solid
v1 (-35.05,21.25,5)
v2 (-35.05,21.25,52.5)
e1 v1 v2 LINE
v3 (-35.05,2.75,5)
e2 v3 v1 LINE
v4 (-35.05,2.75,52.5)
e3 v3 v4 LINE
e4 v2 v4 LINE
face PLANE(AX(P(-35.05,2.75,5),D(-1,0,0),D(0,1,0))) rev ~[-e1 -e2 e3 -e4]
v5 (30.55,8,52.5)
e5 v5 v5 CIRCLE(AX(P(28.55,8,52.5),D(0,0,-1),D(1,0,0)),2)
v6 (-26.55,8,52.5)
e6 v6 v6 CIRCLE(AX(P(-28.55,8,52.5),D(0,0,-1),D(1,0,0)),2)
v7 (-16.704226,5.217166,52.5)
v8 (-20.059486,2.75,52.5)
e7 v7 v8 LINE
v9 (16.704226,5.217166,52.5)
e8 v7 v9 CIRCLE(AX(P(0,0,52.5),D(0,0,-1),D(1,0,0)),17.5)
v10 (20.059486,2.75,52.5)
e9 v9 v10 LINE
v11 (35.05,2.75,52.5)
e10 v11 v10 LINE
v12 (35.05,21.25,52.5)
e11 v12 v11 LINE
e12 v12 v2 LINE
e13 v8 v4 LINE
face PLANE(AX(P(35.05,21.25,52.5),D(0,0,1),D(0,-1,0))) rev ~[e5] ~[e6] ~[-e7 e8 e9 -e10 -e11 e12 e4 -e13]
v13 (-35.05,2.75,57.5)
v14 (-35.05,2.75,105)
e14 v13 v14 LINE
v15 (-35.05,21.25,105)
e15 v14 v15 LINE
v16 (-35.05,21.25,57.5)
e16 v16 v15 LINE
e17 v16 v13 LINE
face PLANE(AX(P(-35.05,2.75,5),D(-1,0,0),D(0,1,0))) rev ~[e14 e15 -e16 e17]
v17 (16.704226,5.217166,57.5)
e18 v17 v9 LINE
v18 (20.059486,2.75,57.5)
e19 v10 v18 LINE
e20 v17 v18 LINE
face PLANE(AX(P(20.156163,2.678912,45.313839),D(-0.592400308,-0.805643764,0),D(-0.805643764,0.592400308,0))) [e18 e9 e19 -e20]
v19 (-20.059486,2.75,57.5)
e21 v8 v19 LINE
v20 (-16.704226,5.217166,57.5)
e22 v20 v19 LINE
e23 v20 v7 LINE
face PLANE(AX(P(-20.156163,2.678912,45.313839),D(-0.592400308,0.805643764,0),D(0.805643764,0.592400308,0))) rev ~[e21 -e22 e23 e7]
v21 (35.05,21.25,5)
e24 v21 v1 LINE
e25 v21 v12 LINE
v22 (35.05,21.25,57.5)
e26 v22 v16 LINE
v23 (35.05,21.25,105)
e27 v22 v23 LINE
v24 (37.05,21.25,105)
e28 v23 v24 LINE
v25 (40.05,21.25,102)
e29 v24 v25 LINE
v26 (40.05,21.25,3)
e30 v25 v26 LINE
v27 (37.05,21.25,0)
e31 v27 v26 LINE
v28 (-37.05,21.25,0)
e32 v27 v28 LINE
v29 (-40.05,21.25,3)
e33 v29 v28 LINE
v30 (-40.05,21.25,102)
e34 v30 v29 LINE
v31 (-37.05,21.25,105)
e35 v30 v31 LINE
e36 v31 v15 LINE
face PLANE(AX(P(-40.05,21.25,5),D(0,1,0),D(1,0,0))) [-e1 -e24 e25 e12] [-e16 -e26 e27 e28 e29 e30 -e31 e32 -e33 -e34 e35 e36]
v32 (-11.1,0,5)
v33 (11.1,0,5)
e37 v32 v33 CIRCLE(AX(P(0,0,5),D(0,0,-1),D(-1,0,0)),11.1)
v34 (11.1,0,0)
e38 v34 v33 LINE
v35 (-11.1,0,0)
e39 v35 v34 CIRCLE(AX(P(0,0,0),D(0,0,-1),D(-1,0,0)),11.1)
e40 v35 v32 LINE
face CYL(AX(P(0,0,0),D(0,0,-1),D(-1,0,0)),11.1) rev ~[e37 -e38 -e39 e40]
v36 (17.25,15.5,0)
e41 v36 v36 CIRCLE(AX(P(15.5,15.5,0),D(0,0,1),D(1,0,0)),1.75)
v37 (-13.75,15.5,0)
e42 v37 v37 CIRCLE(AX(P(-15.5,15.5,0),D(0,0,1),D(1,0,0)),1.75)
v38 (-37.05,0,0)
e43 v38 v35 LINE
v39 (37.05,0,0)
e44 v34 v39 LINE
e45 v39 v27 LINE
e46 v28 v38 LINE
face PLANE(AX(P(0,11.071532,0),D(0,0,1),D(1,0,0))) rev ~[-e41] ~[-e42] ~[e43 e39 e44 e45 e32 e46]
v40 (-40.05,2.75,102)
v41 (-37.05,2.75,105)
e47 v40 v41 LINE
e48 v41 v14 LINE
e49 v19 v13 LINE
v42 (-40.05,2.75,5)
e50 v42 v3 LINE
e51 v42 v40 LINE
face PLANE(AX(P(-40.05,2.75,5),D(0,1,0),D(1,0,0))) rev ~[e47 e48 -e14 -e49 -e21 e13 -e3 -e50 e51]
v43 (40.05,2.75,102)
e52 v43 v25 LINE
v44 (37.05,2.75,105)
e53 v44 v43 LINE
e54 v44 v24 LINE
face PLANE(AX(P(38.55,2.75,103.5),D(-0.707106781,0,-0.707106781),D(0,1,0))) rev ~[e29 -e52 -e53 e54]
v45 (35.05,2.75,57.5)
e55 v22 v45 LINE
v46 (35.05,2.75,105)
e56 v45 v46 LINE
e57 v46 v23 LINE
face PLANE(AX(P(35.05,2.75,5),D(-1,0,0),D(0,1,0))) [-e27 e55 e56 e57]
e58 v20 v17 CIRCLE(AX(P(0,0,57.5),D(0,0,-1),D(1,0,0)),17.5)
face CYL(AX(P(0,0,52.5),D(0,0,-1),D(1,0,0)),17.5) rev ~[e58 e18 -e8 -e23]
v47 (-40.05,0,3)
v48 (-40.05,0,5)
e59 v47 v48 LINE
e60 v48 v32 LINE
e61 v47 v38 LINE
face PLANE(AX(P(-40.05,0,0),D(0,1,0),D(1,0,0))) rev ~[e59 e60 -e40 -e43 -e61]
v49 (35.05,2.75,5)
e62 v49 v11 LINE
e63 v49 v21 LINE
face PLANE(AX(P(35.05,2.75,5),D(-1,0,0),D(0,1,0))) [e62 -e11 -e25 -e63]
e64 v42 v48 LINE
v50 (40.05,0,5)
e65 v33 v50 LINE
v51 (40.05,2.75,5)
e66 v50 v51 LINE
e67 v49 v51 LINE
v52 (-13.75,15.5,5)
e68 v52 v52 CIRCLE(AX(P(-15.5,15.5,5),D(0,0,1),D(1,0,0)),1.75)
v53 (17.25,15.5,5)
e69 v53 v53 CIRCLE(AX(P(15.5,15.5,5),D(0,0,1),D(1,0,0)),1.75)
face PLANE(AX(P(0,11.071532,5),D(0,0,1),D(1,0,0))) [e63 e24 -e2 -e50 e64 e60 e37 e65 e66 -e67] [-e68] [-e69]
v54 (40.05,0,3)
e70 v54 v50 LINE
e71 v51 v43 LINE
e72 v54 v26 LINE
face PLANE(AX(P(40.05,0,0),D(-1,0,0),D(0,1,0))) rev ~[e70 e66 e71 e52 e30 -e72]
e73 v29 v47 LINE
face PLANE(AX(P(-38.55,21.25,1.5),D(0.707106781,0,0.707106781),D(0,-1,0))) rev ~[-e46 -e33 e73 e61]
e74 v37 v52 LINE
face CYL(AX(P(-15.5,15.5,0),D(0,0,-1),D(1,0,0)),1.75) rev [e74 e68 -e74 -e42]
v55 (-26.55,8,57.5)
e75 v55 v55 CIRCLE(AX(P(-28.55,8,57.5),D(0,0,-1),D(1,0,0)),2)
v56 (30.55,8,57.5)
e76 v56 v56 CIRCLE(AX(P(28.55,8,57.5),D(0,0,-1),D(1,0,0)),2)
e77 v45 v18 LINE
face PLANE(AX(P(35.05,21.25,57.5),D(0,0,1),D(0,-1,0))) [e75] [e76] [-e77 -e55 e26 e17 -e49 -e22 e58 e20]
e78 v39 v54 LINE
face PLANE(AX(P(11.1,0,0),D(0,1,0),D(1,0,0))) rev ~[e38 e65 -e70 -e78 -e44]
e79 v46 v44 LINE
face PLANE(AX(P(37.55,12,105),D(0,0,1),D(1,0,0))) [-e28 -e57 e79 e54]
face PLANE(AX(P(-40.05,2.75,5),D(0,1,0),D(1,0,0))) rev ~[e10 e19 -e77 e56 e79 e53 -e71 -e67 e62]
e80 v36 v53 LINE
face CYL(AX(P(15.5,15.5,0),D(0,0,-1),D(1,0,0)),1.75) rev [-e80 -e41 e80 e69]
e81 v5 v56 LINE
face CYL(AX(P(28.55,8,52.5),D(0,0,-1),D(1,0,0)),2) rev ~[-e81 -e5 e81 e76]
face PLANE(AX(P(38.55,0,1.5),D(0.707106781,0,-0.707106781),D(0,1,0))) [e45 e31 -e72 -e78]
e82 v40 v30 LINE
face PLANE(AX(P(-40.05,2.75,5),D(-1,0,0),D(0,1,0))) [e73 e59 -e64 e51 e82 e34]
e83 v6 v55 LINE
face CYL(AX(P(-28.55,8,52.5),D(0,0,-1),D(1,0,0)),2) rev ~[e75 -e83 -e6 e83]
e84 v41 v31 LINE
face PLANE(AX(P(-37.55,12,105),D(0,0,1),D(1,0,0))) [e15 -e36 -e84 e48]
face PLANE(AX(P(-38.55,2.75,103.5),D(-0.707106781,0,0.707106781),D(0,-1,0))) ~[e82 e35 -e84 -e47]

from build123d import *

# Parameters (mm, degrees)
F0_R        = 1.75
F1_DEPTH    = 5
F2_W        = 5
F2_H        = 18.5
F3_DEPTH    = 100
F4_W        = 18.5
F4_H        = 5
F5_DEPTH    = 70.1
F6_R        = 17.5
F6_R_2      = 2
F7_DEPTH    = 25
F8_SIZE     = 3
F9_T1_DEPTH = 19.3723210726


# Not quite as in the source:
# - a fillet or chamfer that OpenCascade refuses, or shapes differently, is made with other operations: its cross-section is extruded or revolved along the edge and cut away or added


with BuildPart() as f1:
    # F0 (on Top) → F1 (new body)
    with BuildSketch(Plane.XY):
        with BuildLine():
            ThreePointArc((-11.1, 0), (0, 11.1), (11.1, 0))
            Line((11.1, 0), (40.05, 0))
            Line((40.05, 0), (40.05, 21.25))
            Line((40.05, 21.25), (-40.05, 21.25))
            Line((-40.05, 21.25), (-40.05, 0))
            Line((-40.05, 0), (-11.1, 0))
        make_face()
        with Locations((-15.5, 15.5)):
            Circle(F0_R, mode=Mode.SUBTRACT)
        with Locations((15.5, 15.5)):
            Circle(F0_R, mode=Mode.SUBTRACT)
    extrude(amount=F1_DEPTH)

    # F2 (on face) → F3 (join)
    with BuildSketch(Plane.XY.offset(5)):
        with Locations((-37.55, 12)):
            Rectangle(F2_W, F2_H)
        with Locations((37.55, 12)):
            Rectangle(F2_W, F2_H)
    extrude(amount=F3_DEPTH)

    # F4 (on face) → F5 (join, through all)
    with BuildSketch(Plane(origin=(35.05, 0, 0), x_dir=(0, -1, 0), z_dir=(-1, 0, 0))):
        with Locations((-12, 55)):
            Rectangle(F4_W, F4_H)
    extrude(amount=F5_DEPTH)

    # F6 (on face) → F7 (cut)
    with BuildSketch(Plane(origin=(0, 0, 52.5), x_dir=(1, 0, 0), z_dir=(0, 0, -1))):
        Circle(F6_R)
        with Locations((-28.55, -8)):
            Circle(F6_R_2)
        with Locations((28.55, -8)):
            Circle(F6_R_2)
    extrude(amount=-F7_DEPTH, mode=Mode.SUBTRACT)

    # F8
    f8_edges = [f1.edges().sort_by_distance(p)[0] for p in [
        (-40.05, 10.625, 0),
        (40.05, 10.625, 0),
        (-40.05, 12, 105),
        (40.05, 12, 105),
    ]]
    chamfer(f8_edges, length=F8_SIZE)

    # F9: chamfer of 3 on 2 edges, made by hand

    # F9_s2 → F9_t1 (cut)
    with BuildSketch(Plane.XY.offset(45.3138394637)):
        with BuildLine():
            Line((-20.1561629778, 2.678911963), (-16.6075492446, 5.288253662))
            Line((-16.6075492446, 5.288253662), (-16.5502776109, 5.270366237))
            ThreePointArc((-16.5502776109, 5.270366237), (-16.9692117334, 4.0248544257), (-17.2233233798, 2.7405714286))
            Line((-17.2233233798, 2.7405714286), (-17.2825779327, 2.69))
            ThreePointArc((-17.2825779327, 2.69), (-18.7193704553, 2.69), (-20.1561629778, 2.618911963))
            Line((-20.1561629778, 2.618911963), (-20.1561629778, 2.678911963))
        make_face()
        with BuildLine():
            Line((20.1561629778, 2.678911963), (16.6075492446, 5.288253662))
            Line((16.6075492446, 5.288253662), (16.5502776109, 5.270366237))
            ThreePointArc((16.5502776109, 5.270366237), (16.9692117334, 4.0248544257), (17.2233233798, 2.7405714286))
            Line((17.2233233798, 2.7405714286), (17.2825779327, 2.69))
            ThreePointArc((17.2825779327, 2.69), (18.7193704553, 2.69), (20.1561629778, 2.618911963))
            Line((20.1561629778, 2.618911963), (20.1561629778, 2.678911963))
        make_face()
    extrude(amount=F9_T1_DEPTH, mode=Mode.SUBTRACT)


solid = f1.part
